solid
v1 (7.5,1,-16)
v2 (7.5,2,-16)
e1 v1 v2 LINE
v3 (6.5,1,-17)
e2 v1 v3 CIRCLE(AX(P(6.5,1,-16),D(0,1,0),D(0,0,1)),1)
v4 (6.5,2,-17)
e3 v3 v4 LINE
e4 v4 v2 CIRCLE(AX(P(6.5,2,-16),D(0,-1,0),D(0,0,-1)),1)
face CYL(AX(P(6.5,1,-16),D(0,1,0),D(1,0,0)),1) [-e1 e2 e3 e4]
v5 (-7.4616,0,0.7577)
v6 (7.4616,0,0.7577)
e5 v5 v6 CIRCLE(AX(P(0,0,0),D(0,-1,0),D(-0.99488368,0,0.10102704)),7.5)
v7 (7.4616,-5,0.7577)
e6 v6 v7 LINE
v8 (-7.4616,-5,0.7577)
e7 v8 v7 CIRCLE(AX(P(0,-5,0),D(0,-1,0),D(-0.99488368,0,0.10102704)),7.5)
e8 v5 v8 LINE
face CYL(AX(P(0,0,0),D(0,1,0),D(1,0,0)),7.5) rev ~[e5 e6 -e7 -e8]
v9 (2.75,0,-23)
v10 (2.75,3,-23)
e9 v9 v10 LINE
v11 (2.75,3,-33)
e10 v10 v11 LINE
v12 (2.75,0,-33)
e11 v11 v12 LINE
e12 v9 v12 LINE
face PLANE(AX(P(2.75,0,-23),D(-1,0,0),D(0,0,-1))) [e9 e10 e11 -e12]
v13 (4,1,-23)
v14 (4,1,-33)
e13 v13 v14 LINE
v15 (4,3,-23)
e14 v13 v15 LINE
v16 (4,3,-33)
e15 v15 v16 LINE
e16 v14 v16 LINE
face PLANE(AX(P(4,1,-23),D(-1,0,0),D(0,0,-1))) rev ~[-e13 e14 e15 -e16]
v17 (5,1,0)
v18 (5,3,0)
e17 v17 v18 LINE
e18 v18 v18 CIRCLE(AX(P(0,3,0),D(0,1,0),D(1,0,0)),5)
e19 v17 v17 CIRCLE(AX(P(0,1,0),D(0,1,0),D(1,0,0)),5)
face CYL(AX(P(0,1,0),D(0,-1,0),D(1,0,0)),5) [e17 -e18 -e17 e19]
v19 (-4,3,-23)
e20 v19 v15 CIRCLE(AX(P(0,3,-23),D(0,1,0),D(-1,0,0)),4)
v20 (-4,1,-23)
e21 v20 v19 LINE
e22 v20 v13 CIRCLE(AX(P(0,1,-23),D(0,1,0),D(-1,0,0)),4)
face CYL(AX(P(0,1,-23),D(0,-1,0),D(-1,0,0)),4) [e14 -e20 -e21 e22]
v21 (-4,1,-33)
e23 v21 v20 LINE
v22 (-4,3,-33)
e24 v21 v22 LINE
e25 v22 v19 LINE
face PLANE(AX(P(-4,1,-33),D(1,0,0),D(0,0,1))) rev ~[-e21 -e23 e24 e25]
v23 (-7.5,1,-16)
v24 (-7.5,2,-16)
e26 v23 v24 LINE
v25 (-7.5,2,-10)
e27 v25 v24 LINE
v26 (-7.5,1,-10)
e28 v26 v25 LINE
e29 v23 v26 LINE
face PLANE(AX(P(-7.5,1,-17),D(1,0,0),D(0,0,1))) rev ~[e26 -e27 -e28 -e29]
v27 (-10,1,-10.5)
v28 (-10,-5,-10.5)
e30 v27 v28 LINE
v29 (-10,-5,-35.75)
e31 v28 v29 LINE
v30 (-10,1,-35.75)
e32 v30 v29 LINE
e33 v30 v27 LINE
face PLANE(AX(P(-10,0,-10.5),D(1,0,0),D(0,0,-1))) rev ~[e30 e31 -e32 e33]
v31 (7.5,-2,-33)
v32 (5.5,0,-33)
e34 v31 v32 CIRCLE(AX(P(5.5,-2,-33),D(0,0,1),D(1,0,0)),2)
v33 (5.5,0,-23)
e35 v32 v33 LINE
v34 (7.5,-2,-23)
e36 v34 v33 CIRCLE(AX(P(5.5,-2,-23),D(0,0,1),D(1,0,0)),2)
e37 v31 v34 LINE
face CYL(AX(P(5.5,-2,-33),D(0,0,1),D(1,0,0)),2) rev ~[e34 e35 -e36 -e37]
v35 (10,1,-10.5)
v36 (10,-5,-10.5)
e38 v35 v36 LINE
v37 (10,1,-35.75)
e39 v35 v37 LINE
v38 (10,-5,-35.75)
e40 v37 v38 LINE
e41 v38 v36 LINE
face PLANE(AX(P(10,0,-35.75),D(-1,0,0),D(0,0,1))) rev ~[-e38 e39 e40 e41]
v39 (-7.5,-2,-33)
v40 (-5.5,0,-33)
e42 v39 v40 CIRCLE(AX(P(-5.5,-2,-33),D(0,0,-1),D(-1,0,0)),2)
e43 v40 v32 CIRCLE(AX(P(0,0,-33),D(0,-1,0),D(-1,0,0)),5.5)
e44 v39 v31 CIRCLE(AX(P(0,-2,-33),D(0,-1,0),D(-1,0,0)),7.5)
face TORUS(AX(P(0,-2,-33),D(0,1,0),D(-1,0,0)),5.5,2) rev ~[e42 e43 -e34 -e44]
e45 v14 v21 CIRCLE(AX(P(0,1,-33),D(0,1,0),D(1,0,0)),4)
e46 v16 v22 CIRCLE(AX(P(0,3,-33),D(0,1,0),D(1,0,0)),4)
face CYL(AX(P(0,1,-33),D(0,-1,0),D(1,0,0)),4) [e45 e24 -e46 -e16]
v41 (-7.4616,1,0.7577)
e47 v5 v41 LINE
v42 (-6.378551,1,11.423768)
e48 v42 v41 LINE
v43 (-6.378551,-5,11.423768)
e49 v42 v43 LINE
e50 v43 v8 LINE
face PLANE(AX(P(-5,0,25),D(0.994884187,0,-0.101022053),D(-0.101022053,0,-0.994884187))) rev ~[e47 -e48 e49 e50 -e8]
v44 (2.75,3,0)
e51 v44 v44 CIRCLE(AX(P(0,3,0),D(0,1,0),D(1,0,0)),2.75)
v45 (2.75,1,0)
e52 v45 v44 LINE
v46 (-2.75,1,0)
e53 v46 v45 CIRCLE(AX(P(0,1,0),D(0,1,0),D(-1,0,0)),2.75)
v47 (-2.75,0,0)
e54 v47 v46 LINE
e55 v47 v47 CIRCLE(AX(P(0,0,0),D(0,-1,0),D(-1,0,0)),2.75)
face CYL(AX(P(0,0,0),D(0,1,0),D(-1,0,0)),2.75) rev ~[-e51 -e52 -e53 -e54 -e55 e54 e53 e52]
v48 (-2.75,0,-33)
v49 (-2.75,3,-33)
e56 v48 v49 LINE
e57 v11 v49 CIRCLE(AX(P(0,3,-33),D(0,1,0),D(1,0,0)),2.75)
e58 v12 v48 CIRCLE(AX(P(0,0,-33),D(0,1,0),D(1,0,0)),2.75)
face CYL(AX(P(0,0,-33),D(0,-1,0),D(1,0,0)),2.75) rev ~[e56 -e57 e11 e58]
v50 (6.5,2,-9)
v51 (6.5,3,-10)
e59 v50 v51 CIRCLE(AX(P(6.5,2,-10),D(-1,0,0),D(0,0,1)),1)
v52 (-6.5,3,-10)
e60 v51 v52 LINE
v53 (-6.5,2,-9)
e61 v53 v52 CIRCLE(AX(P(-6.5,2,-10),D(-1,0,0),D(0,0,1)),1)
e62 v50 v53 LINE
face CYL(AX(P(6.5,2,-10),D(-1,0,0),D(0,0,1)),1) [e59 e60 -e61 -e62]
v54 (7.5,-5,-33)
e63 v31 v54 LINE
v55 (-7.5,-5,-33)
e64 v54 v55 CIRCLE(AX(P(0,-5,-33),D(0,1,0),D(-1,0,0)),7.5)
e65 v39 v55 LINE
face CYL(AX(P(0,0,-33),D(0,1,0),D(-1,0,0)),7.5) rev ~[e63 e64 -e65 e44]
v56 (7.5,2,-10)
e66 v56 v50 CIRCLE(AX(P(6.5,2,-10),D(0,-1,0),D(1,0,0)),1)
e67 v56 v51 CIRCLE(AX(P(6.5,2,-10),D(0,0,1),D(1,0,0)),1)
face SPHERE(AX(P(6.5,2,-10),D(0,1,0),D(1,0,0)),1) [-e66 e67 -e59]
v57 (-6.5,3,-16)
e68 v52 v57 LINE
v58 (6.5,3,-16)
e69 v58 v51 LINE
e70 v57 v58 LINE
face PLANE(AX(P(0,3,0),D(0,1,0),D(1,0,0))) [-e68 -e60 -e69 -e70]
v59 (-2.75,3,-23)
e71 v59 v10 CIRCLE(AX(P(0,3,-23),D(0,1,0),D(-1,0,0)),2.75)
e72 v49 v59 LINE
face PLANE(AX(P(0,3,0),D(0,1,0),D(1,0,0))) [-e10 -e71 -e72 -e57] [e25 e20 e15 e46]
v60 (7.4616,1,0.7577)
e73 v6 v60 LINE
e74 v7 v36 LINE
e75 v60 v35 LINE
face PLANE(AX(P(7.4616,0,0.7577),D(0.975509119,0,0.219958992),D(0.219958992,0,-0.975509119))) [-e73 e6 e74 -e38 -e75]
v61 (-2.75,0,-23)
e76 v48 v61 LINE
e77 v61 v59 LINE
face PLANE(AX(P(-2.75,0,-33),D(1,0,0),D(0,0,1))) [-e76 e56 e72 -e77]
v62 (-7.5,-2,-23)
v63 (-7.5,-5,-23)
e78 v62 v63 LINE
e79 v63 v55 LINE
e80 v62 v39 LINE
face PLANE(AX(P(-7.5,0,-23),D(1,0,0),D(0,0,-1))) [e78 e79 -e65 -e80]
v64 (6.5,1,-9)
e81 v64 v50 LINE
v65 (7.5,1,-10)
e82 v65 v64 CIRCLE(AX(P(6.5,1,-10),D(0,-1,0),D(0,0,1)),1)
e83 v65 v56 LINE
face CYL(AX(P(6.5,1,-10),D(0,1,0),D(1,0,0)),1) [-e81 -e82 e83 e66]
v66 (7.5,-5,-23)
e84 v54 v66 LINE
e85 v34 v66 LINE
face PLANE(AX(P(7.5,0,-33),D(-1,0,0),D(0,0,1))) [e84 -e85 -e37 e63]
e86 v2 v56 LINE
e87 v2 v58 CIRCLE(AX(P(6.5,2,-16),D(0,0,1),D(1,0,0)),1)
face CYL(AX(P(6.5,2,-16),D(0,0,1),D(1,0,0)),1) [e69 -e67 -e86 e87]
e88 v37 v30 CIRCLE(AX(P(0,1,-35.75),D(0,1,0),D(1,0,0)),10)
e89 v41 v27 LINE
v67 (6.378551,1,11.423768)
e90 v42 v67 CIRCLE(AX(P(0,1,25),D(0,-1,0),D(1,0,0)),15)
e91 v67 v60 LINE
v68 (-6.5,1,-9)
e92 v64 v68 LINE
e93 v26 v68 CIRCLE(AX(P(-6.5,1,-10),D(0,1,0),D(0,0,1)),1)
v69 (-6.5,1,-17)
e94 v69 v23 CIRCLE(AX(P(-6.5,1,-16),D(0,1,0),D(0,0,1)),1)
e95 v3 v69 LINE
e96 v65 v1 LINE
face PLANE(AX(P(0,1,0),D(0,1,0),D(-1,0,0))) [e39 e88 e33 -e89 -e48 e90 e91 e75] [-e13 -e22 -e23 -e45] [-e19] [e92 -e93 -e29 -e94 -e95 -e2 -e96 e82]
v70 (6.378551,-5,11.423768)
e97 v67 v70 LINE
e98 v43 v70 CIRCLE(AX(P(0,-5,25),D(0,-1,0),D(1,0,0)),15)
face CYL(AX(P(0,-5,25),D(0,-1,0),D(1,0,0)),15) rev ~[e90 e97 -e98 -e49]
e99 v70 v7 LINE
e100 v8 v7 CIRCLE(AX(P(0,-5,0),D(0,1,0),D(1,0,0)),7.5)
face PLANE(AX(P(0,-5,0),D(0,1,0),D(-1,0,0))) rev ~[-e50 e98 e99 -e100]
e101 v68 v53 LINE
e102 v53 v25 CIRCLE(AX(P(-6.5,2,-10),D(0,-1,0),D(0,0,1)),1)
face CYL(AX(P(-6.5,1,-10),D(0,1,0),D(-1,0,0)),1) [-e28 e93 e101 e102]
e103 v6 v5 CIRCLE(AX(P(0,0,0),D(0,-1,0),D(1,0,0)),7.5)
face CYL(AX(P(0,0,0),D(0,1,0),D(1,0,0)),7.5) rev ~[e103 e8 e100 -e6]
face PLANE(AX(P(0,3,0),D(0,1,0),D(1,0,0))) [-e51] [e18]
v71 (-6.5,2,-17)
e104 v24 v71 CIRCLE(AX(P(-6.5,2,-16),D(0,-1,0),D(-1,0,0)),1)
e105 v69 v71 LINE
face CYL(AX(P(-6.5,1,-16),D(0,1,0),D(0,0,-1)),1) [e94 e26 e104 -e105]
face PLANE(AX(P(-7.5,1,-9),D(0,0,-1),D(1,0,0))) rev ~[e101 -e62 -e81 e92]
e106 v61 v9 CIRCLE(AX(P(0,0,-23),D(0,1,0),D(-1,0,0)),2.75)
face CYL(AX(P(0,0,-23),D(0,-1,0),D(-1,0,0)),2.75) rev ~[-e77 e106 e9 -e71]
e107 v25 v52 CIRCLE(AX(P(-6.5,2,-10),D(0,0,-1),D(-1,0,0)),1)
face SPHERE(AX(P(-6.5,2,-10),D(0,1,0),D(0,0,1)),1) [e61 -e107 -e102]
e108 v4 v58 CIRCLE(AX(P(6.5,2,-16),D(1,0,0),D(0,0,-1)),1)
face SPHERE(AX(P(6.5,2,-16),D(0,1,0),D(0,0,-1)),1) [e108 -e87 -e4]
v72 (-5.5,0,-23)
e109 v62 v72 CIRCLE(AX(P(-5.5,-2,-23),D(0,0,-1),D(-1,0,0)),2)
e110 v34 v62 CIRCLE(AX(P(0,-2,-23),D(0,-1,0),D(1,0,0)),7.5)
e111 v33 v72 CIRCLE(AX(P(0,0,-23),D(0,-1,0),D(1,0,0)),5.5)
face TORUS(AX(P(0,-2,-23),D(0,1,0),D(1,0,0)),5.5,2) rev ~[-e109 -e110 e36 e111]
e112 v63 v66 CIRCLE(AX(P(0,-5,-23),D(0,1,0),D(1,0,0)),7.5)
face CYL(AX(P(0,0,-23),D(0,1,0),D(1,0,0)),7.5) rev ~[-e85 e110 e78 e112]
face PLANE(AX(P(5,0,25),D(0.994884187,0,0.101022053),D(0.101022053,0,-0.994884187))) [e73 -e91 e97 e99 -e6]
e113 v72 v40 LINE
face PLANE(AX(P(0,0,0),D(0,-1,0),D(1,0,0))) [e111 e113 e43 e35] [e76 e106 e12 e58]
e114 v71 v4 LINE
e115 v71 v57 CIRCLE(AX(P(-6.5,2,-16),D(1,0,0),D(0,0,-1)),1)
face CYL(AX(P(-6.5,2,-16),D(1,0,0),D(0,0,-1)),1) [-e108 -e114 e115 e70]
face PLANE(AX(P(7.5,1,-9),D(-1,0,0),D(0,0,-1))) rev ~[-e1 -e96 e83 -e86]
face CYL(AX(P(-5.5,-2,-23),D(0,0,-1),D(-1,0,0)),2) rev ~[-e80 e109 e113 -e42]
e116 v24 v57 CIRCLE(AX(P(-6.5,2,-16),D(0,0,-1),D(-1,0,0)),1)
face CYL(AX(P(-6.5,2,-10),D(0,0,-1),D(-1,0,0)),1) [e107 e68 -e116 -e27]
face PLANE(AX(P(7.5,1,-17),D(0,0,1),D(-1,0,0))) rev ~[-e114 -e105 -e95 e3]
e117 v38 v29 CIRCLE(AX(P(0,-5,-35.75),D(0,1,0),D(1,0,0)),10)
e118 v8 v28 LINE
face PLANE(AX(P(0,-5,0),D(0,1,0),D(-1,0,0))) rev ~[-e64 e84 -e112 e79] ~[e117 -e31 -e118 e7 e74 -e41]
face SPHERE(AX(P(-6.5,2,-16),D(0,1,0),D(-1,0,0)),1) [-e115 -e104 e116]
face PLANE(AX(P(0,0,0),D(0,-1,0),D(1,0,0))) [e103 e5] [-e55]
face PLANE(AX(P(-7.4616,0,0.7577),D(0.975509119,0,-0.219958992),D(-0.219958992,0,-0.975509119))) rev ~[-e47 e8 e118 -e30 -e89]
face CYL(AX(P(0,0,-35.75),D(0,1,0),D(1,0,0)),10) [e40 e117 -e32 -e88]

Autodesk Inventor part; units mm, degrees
ref_plane "YZ Plane" through (0, 0, 0) normal (1, 0, 0) x (0, 1, 0)
ref_plane "XZ Plane" through (0, 0, 0) normal (0, 1, 0) x (-1, 0, 0)
ref_plane "XY Plane" through (0, 0, 0) normal (0, 0, 1) x (1, 0, 0)
sketch "Sketch15" plane through (0, 0, 0) normal (0, 1, 0) x (-1, 0, 0)
  circle A0 centre (0, 0) radius 2.75
  circle A1 centre (0, 0) radius 7.5
  line L0 (0, 0) -> (0, -28)
  line L1 (0, -33) -> (0, -23) construction
  line L2 (2.75, -33) -> (2.75, -23)
  line L3 (-2.75, -23) -> (-2.75, -33)
  arc A2 (-2.75, -33) -> (2.75, -33) centre (0, -33) ccw
  arc A3 (2.75, -23) -> (-2.75, -23) centre (0, -23) ccw
  line L4 (0, -43) -> (0, -13) construction
  line L5 (0, 0) -> (0, -14)
  line L6 (-10, -15.5) -> (10, -15.5)
  line L7 (10, -15.5) -> (10, -10.5)
  line L8 (10, -10.5) -> (-10, -10.5)
  line L9 (-10, -10.5) -> (-10, -15.5)
  line L10 (-10, -15.5) -> (10, -10.5) construction
  line L11 (10, -15.5) -> (-10, -10.5) construction
  line L12 (7.4616, 0.7577) -> (10, -10.5)
  line L13 (-7.4616, 0.7577) -> (-10, -10.5)
  line L14 (0, -35.75) -> (0, -20.25) construction
  line L15 (10, -35.75) -> (10, -20.25)
  line L16 (-10, -20.25) -> (-10, -35.75)
  arc A4 (-10, -35.75) -> (10, -35.75) centre (0, -35.75) ccw
  arc A5 (10, -20.25) -> (-10, -20.25) centre (0, -20.25) ccw
  line L17 (10, -15.5) -> (10, -20.25)
  line L18 (-10, -15.5) -> (-10, -20.25)
  line L19 (0, 0) -> (0, 25)
  circle A6 centre (0, 25) radius 2.75
  circle A7 centre (0, 25) radius 5
  line L20 (0, 25) -> (5, 25)
  line L21 (0, 25) -> (-5, 25)
  line L22 (5, 25) -> (7.4616, 0.7577)
  line L23 (-5, 25) -> (-7.4616, 0.7577)
  point P0 (-8.7999, -15.5)
  point P1 (8.7999, -15.5)
  dimension "d102" = 5.5
  dimension "d103" = 15
  dimension "d104" = 28
  dimension "d105" = 5
  dimension "d106" = 5.5
  dimension "d107" = 15
  dimension "d109" = 14
  dimension "d110" = 20
  dimension "d111" = 5
  dimension "d112" = 20
  dimension "d133" = 25
  dimension "d134" = 5.5
  dimension "d135" = 10
extrude "Extrusion14" add sketch "Sketch15" along normal blind 1 contours A0 L19 A1 L0 | A0 L0 A1 L19 | L19 A7 L22 A1 | A1 L23 A7 L19 | L0 A5 L8 L13 A1 | A1 L12 L8 A5 L0 | A7 L21 A6 L19 | L19 A6 L20 A7 | A5 L8 L0 | L0 L8 A5 | L7 L6 A5 L8 | L20 A6 L21 A7 | L8 A5 L6 L9 | L8 A5 L6 L0 | L0 L6 A5 L8 | L17 A5 L6 | L6 A5 L18 | A5 L15 A4 L16 L6
sketch "Sketch16" plane through (0, 1, 0) normal (0, 1, 0) x (1, 0, 0)
  circle A0 centre (0, 0) radius 2.75 projected
  circle A1 centre (0, 0) radius 2.75
  line L0 (-2.75, 23) -> (-2.75, 33) projected
  line L1 (-2.75, 28) -> (0, 28)
  line L2 (0, 33) -> (0, 23) construction
  line L3 (-2.75, 33) -> (-2.75, 23)
  line L4 (2.75, 23) -> (2.75, 33)
  arc A2 (2.75, 33) -> (-2.75, 33) centre (0, 33) ccw
  arc A3 (-2.75, 23) -> (2.75, 23) centre (0, 23) ccw
  line L5 (0, 33) -> (0, 23) construction
  line L6 (-4, 33) -> (-4, 23)
  line L7 (4, 23) -> (4, 33)
  arc A4 (4, 33) -> (-4, 33) centre (0, 33) ccw
  arc A5 (-4, 23) -> (4, 23) centre (0, 23) ccw
  circle A6 centre (0, -25) radius 2.75 projected
  circle A7 centre (0, -25) radius 2.75
  circle A8 centre (0, -25) radius 5
  circle A9 centre (0, 0) radius 5
  point P0 (-7.4616, -0.7577)
  point P1 (-2.75, 33)
  dimension "d115" = 5
  dimension "d116" = 5.5
  dimension "d117" = 5
  dimension "d118" = 8
  dimension "d136" = 5.5
  dimension "d137" = 10
  dimension "d138" = 10
extrude "Extrusion15" add sketch "Sketch16" along normal blind 2
sketch "Sketch17" plane through (0, 1, 0) normal (0, 1, 0) x (1, 0, 0)
  line L0 (0, 0) -> (0, 13)
  line L1 (7.5, 17) -> (-7.5, 17)
  line L2 (-7.5, 17) -> (-7.5, 9)
  line L3 (-7.5, 9) -> (7.5, 9)
  line L4 (7.5, 9) -> (7.5, 17)
  line L5 (7.5, 17) -> (-7.5, 9) construction
  line L6 (-7.5, 17) -> (7.5, 9) construction
  dimension "d121" = 13
  dimension "d129" = 15
  dimension "d130" = 8
extrude "Extrusion16" add sketch "Sketch17" along normal blind 2
fillet "Fillet7" radius 1 4 edges at (-7.5, 2, -9) (-7.5, 2, -17) (7.5, 2, -9) (7.5, 2, -17)
fillet "Fillet8" radius 1 8 edges at (7.2071, 3, -9.2929) (7.5, 3, -13) (7.2071, 3, -16.7071) (0, 3, -17) (-7.2071, 3, -16.7071) (-7.5, 3, -13) (-7.2071, 3, -9.2929) (0, 3, -9)
sketch "Sketch18" plane through (0, 0, 0) normal (0, -1, 0) x (1, 0, 0)
  arc A0 (2.75, -23) -> (-2.75, -23) centre (0, -23) ccw projected
  arc A1 (-2.75, -33) -> (2.75, -33) centre (0, -33) ccw projected
  line L0 (0, -23) -> (0, -33) construction
  line L1 (-7.5, -23) -> (-7.5, -33)
  line L2 (7.5, -33) -> (7.5, -23)
  arc A2 (7.5, -23) -> (-7.5, -23) centre (0, -23) ccw
  arc A3 (-7.5, -33) -> (7.5, -33) centre (0, -33) ccw
  circle A4 centre (0, 0) radius 7.5
  circle A5 centre (0, 25) radius 2.75 projected
  circle A6 centre (0, 25) radius 6
  point P0 (0, -28)
  dimension "d139" = 15
  dimension "d143" = 15
  dimension "d144" = 12
move faces "Move1" translate (0, -5, 0) faces at (-7.5833, 0, -23.0833)
extrude "Extrusion17" cut sketch "Sketch18" along normal blind 10
sketch "Sketch19" plane through (0, -5, -35.75) normal (0, -1, 0) x (1, 0, 0)
  circle A0 centre (0, 60.75) radius 2.75 projected
  circle A1 centre (0, 60.75) radius 15
  point P0 (0, 35.75)
  dimension "d147" = 30
extrude "Extrusion18" cut sketch "Sketch19" against normal through all
fillet "Fillet9" radius 2 4 edges at (0, 0, -15.5) (-7.5, 0, -28) (0, 0, -40.5) (7.5, 0, -28)
properties part number "Belt_Restraint"
